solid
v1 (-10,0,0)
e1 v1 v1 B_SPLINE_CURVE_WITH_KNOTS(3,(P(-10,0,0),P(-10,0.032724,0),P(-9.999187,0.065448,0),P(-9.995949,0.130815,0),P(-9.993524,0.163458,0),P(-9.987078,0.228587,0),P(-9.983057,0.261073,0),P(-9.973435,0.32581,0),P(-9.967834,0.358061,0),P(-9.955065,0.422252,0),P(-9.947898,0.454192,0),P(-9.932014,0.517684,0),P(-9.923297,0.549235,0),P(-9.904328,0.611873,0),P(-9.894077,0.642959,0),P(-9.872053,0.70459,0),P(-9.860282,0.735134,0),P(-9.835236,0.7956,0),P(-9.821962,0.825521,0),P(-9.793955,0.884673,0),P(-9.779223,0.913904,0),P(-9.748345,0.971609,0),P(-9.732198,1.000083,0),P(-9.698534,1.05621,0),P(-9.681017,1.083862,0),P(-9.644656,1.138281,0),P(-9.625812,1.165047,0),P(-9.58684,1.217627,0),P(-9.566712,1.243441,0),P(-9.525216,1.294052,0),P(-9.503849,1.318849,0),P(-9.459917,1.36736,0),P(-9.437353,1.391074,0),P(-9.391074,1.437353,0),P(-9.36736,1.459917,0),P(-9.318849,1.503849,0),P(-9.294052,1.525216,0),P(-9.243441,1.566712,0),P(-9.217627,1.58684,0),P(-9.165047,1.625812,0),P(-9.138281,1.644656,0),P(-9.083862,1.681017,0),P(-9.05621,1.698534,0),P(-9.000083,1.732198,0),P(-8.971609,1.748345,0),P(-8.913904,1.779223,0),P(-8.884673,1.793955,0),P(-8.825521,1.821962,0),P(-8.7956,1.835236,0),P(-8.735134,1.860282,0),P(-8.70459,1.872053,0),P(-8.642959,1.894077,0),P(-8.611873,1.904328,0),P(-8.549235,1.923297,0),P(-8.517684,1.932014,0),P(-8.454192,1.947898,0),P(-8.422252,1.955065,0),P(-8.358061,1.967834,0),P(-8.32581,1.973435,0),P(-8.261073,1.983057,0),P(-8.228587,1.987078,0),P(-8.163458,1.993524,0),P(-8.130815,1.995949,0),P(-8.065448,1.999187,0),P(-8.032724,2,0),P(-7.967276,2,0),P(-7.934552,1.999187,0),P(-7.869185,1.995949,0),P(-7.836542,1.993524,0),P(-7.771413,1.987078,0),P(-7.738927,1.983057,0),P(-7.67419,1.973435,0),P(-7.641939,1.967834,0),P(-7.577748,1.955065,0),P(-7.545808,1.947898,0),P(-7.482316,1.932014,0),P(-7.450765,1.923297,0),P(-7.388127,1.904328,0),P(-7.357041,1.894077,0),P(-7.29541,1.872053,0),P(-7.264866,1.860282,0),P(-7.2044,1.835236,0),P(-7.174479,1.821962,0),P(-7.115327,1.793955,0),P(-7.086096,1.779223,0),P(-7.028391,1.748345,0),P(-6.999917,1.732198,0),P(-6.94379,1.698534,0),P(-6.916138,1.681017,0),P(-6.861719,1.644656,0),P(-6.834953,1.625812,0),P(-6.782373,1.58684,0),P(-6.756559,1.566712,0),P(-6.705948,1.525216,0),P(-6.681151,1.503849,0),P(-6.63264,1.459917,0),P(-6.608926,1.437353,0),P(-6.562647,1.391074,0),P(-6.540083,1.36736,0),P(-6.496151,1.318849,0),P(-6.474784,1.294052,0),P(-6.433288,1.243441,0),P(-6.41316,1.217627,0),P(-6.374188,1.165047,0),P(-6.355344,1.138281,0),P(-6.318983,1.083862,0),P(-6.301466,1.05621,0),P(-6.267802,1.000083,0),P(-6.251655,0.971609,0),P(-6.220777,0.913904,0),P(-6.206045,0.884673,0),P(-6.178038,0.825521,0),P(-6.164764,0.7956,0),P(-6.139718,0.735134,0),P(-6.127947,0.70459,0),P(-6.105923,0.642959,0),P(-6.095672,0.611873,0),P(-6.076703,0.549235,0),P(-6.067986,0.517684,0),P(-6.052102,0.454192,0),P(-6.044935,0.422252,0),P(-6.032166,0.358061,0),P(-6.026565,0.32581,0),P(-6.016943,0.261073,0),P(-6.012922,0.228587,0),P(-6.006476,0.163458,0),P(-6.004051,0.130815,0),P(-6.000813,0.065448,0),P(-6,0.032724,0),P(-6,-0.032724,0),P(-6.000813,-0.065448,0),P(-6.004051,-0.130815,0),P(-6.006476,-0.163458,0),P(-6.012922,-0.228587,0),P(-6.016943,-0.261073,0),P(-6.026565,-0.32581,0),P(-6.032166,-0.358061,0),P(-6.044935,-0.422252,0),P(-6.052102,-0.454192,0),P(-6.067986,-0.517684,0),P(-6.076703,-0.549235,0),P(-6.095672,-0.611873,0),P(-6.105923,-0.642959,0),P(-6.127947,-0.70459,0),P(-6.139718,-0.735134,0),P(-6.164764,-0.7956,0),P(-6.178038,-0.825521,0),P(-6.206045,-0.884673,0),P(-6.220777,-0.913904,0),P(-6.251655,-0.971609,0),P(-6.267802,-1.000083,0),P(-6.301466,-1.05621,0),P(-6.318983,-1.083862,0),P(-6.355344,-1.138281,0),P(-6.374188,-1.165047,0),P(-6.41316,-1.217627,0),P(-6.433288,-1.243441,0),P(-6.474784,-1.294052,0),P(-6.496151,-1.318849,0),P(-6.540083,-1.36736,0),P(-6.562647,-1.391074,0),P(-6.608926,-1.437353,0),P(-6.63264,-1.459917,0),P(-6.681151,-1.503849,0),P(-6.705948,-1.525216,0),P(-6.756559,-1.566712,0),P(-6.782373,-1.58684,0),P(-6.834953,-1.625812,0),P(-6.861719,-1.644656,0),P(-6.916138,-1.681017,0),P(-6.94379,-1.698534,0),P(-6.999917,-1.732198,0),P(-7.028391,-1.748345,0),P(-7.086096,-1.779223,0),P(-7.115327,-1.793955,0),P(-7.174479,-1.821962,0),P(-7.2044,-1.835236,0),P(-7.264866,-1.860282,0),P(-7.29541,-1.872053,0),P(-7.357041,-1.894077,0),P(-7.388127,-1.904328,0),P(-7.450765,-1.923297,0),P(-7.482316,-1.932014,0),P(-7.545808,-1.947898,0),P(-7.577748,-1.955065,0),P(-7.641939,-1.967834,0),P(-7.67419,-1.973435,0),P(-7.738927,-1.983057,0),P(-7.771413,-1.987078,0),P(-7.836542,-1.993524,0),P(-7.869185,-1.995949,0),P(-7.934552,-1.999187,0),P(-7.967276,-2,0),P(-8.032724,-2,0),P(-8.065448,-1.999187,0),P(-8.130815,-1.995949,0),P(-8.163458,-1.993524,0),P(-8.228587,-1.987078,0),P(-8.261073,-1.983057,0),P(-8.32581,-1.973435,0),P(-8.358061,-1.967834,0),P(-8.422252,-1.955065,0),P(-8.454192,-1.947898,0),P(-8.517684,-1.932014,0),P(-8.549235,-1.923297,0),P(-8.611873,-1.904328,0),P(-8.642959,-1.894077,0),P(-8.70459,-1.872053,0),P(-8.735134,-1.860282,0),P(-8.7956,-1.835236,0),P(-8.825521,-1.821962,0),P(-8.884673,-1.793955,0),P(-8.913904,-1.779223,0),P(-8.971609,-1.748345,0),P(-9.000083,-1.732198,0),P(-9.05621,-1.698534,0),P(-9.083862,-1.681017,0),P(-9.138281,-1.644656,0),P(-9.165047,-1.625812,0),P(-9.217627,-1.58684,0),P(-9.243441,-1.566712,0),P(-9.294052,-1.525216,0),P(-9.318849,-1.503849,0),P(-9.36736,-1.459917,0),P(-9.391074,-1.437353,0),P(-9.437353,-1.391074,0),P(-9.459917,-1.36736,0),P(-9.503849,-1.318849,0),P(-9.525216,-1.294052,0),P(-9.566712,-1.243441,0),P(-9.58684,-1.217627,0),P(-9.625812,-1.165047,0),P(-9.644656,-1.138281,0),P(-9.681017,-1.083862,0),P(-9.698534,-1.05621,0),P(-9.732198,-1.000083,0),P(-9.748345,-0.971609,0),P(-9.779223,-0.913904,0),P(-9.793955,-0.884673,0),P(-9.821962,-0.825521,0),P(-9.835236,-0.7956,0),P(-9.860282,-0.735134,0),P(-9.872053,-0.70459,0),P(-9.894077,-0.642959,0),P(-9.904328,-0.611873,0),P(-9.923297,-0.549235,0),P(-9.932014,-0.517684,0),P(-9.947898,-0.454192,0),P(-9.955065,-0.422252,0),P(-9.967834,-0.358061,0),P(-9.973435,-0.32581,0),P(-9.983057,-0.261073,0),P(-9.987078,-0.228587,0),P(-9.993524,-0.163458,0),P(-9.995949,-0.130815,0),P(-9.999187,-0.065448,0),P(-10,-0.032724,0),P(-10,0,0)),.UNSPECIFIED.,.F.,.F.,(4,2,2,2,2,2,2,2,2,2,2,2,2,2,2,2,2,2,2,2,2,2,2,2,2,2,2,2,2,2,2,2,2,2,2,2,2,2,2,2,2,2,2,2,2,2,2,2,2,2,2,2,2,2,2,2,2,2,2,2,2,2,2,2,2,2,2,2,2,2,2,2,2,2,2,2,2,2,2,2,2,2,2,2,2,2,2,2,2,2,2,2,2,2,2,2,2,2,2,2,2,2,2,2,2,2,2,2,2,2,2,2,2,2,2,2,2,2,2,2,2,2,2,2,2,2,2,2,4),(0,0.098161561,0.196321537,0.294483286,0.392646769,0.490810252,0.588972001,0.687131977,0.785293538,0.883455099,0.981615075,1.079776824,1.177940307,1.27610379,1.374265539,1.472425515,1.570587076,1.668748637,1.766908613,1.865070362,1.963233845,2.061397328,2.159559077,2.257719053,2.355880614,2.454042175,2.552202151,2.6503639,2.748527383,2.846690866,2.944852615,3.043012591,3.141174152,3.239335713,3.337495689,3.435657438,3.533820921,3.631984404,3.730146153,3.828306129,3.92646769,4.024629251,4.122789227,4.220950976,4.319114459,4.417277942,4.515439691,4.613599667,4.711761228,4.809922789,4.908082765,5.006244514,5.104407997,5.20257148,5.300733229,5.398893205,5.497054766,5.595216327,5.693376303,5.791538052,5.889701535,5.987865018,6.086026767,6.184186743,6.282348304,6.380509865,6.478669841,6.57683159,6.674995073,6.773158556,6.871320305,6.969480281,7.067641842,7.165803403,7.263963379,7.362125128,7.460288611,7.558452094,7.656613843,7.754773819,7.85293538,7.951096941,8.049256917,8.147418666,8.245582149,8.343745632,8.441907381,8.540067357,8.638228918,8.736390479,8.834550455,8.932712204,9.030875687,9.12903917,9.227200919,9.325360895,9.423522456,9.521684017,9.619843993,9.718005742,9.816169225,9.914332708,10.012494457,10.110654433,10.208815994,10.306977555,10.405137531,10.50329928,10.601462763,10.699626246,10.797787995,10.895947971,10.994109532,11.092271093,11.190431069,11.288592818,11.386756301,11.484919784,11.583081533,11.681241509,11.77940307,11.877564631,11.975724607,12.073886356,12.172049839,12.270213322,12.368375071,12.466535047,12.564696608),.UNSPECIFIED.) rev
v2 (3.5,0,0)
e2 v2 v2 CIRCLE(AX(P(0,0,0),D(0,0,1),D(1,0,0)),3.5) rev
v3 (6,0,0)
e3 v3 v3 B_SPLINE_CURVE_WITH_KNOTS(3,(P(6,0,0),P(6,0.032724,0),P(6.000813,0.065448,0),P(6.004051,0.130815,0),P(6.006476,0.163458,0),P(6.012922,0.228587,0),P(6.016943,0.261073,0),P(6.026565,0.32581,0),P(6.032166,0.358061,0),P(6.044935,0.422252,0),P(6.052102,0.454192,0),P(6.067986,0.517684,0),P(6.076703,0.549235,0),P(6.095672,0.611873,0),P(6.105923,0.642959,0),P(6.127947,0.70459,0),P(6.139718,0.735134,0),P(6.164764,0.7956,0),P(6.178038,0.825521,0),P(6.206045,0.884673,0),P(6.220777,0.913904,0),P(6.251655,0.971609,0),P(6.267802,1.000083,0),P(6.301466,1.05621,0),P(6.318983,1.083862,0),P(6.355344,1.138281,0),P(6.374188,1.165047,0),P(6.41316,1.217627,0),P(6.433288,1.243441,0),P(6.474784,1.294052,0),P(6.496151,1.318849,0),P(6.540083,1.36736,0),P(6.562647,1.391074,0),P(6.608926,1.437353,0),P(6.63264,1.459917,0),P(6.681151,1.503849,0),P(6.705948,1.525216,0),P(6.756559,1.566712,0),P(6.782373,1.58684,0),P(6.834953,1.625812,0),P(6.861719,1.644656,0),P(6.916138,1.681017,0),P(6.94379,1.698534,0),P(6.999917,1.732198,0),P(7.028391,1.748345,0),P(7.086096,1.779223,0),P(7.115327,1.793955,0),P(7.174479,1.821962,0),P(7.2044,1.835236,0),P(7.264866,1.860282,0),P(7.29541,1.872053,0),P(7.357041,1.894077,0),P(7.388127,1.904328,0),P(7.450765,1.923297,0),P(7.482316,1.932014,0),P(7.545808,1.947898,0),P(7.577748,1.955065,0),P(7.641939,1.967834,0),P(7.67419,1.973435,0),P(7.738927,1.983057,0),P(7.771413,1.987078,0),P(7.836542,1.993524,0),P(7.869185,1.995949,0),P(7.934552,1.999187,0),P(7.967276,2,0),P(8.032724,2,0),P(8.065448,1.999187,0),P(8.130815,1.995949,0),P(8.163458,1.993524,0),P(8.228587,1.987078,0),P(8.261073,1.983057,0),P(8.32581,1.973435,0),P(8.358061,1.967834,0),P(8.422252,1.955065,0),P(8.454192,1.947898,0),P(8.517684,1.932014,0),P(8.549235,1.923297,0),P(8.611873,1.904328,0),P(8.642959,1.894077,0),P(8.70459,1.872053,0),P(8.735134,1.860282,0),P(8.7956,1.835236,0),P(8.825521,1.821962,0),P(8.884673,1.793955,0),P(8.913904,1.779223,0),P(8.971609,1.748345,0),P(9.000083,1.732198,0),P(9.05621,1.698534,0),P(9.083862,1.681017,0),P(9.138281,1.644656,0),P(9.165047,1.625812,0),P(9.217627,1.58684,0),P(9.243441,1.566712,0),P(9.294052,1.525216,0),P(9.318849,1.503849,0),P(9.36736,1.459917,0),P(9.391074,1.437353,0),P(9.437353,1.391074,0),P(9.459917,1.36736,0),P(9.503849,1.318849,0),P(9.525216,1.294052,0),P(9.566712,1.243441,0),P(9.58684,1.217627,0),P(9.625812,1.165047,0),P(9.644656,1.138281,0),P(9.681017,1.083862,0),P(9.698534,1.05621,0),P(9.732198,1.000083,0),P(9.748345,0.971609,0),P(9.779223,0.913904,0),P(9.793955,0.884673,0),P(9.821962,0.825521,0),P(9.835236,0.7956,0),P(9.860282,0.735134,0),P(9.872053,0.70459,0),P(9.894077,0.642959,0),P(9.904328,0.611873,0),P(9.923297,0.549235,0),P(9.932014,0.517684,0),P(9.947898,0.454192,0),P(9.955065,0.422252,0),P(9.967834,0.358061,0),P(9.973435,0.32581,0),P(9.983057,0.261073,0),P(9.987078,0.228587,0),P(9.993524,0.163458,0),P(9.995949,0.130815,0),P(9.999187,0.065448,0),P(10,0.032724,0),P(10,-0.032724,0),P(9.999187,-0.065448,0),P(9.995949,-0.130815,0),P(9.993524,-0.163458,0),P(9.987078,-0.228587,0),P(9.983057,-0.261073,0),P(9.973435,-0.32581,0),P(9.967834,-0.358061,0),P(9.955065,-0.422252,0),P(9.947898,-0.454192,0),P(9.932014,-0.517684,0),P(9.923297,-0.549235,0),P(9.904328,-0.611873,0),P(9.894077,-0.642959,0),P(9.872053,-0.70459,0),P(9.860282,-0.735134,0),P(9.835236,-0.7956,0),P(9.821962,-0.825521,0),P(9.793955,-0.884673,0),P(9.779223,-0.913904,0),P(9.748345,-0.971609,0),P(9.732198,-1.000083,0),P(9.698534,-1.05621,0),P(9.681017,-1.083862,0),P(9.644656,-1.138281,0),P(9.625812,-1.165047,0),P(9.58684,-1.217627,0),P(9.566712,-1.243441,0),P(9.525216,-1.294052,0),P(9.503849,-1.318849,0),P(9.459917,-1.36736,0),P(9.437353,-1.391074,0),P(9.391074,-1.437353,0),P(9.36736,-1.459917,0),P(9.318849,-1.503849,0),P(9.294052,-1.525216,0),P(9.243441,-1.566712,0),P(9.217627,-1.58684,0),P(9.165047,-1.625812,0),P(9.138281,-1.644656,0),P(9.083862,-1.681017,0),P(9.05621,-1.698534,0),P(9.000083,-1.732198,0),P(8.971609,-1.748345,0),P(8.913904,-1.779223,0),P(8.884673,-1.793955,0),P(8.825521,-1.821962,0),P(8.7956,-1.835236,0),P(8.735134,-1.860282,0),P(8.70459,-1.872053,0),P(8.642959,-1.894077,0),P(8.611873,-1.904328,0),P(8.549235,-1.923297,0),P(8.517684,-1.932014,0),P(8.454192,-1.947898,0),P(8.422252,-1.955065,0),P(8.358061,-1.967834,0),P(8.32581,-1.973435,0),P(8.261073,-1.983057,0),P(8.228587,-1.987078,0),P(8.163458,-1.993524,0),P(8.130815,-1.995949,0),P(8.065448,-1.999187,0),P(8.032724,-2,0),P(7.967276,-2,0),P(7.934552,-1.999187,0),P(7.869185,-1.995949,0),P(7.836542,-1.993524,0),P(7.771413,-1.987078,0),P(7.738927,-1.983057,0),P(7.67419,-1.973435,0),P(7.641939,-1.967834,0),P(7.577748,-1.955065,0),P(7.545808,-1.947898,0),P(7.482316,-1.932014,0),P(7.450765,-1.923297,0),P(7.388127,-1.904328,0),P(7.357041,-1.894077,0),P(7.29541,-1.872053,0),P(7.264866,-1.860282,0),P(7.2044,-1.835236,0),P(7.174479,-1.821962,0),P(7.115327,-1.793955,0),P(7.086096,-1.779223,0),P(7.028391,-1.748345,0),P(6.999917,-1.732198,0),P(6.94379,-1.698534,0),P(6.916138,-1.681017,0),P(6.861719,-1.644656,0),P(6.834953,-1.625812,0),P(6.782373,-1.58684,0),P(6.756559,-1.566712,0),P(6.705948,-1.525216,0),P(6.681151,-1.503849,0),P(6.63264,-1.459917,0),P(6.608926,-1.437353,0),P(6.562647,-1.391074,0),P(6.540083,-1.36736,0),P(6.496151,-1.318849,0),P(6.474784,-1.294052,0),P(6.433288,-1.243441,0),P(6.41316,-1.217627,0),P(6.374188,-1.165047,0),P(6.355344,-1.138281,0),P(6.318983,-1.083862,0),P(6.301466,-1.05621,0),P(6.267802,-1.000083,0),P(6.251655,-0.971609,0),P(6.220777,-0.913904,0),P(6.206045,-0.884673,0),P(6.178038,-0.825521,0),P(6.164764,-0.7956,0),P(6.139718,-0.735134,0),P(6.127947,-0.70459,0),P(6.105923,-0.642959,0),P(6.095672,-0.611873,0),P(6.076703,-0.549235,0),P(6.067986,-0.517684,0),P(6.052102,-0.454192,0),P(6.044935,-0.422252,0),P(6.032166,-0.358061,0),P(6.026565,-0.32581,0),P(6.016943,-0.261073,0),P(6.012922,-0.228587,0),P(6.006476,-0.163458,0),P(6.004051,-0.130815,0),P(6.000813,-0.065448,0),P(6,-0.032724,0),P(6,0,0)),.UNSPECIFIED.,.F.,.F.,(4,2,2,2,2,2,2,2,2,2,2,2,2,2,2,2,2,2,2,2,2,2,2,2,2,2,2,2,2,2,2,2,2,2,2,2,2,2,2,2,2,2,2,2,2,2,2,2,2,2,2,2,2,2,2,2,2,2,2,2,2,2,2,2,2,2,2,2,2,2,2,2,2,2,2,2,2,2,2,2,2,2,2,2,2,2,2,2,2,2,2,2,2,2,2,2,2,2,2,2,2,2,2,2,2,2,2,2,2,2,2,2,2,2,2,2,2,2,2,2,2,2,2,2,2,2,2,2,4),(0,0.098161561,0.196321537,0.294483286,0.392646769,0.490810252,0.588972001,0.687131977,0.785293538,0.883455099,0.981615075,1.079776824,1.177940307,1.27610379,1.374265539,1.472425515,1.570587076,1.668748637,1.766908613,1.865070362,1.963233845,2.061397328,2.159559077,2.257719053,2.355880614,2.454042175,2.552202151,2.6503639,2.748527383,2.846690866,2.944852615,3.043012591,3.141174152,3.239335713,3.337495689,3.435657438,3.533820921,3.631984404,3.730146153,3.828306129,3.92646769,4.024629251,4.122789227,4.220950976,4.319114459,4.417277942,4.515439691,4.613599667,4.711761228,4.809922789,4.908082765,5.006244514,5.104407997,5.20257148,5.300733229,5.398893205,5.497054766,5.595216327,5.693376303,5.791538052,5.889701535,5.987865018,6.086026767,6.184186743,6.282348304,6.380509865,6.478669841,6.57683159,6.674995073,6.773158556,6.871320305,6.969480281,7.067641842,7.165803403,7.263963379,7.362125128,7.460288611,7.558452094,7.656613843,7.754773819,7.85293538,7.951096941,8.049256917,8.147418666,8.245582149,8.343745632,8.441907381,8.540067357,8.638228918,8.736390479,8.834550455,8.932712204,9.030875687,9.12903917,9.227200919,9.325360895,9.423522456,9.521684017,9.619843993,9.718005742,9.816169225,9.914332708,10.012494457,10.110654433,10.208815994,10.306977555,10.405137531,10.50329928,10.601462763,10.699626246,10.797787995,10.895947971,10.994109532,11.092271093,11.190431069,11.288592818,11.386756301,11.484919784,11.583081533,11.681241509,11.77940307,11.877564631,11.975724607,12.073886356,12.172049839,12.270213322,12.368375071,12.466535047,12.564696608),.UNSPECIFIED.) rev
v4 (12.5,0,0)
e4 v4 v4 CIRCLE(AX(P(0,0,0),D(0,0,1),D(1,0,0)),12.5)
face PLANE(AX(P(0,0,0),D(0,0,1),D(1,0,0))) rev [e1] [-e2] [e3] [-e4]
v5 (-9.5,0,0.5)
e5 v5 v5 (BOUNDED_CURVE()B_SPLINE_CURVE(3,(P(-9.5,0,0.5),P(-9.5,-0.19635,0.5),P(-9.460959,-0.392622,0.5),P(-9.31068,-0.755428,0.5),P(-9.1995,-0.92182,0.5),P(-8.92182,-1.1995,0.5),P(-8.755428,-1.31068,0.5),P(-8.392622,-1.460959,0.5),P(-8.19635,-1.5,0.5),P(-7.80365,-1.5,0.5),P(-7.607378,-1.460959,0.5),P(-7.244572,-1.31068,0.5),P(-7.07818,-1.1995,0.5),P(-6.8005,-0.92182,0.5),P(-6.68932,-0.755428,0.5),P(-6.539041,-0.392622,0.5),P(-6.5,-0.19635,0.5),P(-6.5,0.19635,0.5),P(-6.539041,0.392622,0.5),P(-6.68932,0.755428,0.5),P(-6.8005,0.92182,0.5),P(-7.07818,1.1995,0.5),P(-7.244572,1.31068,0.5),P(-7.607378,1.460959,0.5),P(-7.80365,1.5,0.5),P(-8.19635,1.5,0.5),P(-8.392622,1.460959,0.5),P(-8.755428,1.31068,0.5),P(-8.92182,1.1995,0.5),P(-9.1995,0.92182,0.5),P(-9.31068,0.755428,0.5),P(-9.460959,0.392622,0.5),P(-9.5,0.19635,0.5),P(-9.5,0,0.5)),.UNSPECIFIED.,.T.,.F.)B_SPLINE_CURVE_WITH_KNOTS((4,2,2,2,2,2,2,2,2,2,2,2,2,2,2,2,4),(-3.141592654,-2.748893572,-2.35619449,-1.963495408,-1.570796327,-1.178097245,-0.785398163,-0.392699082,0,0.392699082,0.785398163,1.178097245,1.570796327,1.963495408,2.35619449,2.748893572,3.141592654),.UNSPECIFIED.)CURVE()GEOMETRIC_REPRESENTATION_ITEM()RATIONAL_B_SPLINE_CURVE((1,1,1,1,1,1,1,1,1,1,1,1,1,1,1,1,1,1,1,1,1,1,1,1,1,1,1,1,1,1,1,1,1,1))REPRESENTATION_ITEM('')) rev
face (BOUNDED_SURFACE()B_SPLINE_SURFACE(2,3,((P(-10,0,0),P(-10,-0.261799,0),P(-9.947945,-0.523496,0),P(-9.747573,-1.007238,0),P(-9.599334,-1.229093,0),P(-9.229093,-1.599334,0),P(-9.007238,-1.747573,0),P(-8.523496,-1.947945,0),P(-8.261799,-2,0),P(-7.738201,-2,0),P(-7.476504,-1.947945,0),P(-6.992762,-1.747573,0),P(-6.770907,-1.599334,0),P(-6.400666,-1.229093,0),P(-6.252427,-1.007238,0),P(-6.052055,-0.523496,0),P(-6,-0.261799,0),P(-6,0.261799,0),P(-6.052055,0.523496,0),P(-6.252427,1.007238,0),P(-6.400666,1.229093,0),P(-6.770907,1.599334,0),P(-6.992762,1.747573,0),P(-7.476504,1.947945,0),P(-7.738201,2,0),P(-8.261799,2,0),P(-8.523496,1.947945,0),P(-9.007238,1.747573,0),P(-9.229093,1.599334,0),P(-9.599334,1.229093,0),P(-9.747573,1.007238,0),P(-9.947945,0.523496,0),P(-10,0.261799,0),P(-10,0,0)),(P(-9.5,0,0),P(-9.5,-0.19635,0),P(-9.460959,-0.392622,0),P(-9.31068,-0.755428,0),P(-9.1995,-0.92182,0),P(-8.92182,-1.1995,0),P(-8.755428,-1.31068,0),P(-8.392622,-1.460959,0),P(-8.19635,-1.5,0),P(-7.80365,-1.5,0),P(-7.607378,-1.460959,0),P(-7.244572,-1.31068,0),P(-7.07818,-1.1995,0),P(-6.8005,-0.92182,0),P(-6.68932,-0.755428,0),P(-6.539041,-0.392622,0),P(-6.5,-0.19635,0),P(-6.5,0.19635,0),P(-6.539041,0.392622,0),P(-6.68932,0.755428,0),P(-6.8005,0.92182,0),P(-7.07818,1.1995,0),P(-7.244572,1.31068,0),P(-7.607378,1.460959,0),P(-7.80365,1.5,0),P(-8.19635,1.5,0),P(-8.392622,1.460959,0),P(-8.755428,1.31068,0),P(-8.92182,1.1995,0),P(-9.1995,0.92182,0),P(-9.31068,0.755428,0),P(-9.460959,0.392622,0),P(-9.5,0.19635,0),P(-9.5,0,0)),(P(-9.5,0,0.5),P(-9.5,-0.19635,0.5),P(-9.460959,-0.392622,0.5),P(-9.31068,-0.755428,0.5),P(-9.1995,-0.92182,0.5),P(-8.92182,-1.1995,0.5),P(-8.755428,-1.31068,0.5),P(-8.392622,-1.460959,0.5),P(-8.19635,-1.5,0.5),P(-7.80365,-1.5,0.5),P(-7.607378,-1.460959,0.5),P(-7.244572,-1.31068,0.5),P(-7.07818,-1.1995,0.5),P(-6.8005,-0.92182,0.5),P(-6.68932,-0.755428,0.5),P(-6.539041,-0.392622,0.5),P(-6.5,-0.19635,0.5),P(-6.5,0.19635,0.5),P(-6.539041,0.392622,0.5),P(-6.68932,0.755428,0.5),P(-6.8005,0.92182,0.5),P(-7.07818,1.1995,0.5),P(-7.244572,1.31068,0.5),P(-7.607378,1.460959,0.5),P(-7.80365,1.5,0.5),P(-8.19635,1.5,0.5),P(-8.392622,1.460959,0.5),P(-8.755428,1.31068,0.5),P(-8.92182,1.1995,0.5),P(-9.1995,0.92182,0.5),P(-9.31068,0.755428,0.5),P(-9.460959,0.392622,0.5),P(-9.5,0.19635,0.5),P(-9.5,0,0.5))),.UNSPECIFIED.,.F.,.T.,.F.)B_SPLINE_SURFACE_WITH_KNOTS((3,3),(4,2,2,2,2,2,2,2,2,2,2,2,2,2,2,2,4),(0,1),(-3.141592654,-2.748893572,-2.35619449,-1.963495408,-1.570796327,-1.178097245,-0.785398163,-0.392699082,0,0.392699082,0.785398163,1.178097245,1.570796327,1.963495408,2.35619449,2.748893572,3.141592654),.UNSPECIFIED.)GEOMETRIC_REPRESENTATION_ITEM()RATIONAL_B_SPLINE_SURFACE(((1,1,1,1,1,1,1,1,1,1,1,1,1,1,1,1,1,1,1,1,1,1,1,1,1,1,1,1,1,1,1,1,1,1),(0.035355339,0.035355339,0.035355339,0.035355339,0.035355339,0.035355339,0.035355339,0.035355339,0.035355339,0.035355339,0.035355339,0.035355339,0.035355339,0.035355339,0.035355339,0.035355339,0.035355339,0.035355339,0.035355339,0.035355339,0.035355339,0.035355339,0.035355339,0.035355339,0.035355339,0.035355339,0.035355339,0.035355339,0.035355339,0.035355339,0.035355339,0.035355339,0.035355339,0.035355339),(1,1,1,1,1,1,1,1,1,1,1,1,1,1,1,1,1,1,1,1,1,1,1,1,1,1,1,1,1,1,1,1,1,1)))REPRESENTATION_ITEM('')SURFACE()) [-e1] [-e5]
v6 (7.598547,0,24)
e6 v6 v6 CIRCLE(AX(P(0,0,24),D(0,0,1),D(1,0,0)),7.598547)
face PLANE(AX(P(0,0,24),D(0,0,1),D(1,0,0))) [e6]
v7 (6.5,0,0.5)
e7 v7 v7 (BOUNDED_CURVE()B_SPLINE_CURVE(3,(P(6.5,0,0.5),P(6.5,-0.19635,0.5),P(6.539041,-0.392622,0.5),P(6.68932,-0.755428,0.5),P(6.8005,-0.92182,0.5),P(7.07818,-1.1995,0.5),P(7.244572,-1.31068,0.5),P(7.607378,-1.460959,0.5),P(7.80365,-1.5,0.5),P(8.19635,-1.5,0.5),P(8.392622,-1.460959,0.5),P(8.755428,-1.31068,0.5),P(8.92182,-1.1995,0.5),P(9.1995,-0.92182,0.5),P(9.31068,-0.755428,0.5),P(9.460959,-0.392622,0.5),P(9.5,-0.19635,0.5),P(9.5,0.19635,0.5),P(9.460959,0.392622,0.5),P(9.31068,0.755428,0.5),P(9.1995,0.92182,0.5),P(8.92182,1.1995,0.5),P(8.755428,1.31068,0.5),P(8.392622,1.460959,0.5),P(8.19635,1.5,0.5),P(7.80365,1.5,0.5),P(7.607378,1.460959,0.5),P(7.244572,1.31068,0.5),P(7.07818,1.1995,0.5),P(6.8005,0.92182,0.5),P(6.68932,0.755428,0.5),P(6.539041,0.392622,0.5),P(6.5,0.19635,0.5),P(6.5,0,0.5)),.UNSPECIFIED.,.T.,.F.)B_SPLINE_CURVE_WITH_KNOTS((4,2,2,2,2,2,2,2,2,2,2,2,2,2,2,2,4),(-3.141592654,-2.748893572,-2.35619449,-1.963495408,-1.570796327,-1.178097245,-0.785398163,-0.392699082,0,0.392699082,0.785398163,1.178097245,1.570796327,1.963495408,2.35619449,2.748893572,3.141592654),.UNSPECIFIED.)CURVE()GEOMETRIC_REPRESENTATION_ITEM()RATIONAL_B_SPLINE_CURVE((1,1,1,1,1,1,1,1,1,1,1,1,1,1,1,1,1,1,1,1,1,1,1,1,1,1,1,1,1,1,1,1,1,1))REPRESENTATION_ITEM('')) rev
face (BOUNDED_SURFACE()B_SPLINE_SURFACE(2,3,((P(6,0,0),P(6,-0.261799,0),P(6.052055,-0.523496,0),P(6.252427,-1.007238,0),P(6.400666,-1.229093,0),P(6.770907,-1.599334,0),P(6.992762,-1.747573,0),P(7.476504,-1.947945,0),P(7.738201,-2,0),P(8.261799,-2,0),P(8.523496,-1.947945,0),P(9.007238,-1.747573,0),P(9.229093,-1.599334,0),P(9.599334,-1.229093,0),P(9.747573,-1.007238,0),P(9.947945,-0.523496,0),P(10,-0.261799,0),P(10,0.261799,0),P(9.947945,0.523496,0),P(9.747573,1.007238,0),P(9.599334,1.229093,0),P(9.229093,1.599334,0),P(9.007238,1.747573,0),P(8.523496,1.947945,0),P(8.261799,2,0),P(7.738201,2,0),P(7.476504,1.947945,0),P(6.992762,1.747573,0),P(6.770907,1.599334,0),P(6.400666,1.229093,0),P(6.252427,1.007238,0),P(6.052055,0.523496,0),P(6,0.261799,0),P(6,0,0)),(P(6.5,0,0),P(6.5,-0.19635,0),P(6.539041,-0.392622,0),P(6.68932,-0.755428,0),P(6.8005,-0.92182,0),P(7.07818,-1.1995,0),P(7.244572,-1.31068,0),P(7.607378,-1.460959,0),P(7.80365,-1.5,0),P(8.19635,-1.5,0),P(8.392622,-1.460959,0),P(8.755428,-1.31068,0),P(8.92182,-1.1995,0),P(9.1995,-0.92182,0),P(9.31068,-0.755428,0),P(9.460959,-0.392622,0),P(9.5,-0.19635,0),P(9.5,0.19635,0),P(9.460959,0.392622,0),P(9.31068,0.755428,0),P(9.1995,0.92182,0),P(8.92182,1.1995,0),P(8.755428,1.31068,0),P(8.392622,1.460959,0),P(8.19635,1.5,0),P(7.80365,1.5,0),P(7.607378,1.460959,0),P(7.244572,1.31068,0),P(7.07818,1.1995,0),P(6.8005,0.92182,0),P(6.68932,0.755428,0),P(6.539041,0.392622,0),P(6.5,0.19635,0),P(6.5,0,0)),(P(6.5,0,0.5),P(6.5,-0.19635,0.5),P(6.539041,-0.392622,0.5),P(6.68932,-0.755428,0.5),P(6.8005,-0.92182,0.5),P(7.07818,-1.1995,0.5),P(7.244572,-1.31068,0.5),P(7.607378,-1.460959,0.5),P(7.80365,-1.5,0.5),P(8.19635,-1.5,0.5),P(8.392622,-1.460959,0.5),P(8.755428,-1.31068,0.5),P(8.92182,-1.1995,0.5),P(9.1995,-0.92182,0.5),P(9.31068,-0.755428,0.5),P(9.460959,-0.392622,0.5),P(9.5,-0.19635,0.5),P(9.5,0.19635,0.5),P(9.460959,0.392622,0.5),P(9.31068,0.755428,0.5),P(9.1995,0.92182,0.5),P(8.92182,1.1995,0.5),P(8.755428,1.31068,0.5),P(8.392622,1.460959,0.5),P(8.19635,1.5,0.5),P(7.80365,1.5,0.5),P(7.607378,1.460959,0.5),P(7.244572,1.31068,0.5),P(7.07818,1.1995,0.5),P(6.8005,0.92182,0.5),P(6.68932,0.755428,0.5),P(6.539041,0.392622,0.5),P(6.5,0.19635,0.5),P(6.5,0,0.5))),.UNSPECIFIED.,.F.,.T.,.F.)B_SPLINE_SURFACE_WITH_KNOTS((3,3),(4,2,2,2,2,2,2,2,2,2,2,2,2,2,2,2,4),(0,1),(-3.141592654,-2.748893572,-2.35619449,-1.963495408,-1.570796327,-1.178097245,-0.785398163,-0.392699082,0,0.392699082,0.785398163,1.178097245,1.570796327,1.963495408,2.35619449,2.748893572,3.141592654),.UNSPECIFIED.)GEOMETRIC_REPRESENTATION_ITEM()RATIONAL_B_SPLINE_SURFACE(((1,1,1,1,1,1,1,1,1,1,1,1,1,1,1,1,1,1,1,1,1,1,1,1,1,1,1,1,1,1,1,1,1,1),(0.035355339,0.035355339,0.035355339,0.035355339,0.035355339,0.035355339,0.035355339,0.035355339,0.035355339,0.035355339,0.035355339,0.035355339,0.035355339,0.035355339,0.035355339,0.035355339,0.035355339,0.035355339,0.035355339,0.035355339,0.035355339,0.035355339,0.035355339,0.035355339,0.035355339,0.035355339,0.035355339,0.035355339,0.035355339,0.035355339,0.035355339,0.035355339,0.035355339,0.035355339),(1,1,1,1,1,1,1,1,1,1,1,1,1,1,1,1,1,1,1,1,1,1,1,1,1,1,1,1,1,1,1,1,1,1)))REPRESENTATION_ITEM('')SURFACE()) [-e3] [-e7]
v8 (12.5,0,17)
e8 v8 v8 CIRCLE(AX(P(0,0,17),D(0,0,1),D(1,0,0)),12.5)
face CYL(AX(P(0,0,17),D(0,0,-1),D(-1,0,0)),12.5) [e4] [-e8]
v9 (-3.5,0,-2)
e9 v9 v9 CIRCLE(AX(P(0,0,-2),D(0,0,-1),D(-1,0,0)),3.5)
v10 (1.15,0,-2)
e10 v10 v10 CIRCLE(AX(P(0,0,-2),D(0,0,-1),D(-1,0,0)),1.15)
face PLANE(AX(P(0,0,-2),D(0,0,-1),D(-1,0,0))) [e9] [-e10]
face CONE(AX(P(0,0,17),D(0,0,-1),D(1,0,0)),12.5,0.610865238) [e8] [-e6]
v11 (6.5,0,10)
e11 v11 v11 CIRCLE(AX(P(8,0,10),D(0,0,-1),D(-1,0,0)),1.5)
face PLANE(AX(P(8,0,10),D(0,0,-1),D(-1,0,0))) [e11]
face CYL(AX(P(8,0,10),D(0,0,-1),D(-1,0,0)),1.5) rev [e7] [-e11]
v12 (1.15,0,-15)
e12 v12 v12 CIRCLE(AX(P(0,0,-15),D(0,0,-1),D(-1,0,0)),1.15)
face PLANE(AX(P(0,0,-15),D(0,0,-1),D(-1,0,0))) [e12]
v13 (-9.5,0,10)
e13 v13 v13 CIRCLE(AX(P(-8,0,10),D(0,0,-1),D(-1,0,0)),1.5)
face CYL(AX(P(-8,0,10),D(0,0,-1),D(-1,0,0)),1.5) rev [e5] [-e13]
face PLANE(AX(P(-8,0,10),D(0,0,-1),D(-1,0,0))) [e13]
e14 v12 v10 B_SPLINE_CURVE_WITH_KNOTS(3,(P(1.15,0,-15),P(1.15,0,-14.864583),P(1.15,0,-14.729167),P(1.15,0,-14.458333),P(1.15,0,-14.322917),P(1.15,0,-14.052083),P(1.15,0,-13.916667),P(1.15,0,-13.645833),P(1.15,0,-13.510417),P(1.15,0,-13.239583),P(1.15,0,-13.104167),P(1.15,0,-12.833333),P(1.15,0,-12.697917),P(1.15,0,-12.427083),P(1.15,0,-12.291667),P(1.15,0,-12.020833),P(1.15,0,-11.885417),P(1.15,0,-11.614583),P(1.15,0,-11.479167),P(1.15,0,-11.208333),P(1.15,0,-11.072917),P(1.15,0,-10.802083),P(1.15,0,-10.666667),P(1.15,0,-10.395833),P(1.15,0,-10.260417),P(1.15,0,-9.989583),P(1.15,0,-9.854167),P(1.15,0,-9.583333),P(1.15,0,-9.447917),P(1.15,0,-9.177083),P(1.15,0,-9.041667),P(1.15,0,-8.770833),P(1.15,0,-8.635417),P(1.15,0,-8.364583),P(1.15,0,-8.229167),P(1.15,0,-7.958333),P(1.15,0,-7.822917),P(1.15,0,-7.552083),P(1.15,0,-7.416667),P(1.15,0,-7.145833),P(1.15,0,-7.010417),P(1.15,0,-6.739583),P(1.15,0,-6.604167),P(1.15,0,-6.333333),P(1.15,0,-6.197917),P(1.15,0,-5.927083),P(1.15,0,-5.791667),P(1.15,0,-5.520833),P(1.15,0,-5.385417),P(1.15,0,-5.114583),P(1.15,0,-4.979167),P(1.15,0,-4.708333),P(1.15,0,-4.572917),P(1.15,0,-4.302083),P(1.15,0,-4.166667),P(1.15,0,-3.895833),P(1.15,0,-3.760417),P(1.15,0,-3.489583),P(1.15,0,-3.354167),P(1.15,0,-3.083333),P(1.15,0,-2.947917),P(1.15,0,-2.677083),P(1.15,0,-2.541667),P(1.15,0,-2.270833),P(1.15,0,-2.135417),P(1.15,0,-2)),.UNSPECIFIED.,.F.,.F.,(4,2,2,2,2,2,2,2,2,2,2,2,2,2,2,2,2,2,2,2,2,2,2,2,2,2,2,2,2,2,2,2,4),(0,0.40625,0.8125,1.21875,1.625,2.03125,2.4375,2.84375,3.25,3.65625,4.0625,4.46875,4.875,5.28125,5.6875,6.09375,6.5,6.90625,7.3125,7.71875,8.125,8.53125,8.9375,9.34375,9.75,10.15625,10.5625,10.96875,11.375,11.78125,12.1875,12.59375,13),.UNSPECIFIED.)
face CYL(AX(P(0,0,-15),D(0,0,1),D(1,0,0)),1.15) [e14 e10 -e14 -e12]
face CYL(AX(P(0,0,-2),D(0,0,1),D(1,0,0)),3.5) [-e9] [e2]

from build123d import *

# Parameters (mm, degrees)
ESQUISSE1_R             = 12.5
BOSS_EXTRU_1_DEPTH      = 17
ESQUISSE2_R             = 12.5
BOSS_EXTRU_2_DEPTH      = 7
BOSS_EXTRU_2_TAPER      = 35
ESQUISSE3_R             = 1.5
ENL_V_MAT_EXTRU_1_DEPTH = 10
CONG_1_SIZE             = 0.5
ESQUISSE4_R             = 3.5
BOSS_EXTRU_3_DEPTH      = 2
ESQUISSE5_R             = 1.15
BOSS_EXTRU_4_DEPTH      = 13


with BuildPart() as part:
    # Esquisse1 → Boss.-Extru.1 (new body)
    with BuildSketch(Plane.XY):
        Circle(ESQUISSE1_R)
    extrude(amount=BOSS_EXTRU_1_DEPTH)

    # Esquisse2 → Boss.-Extru.2 (add)
    with BuildSketch(Plane.XY.offset(17)):
        Circle(ESQUISSE2_R)
    extrude(amount=BOSS_EXTRU_2_DEPTH, taper=BOSS_EXTRU_2_TAPER)

    # Esquisse3 → Enlèv. mat.-Extru.1 (cut)
    with BuildSketch(Plane(origin=(0, 0, 0), x_dir=(-1, 0, 0), z_dir=(0, 0, -1))):
        with Locations((-8, 0)):
            Circle(ESQUISSE3_R)
        with Locations((8, 0)):
            Circle(ESQUISSE3_R)
    extrude(amount=-ENL_V_MAT_EXTRU_1_DEPTH, mode=Mode.SUBTRACT)

    # Congé1
    # a fillet whose section is not a circle: 0.5 mm, written as the material it takes off along each edge
    with BuildSketch(Plane(origin=(-8, 0, 0), x_dir=(-1, 0, 0), z_dir=(0, -1, 0))) as cong_1_piece_1:
        with BuildLine():
            Bezier((1.5 + CONG_1_SIZE, 0), (1.5, 0), (1.5, -CONG_1_SIZE), weights=[1, 0.035355339, 1])
            Line((1.5, -CONG_1_SIZE), (1.5, 0))
            Line((1.5, 0), (1.5 + CONG_1_SIZE, 0))
        make_face()
    revolve(axis=Axis((-8, 0, 0), (0, 0, -1)), mode=Mode.SUBTRACT)
    with BuildSketch(Plane(origin=(8, 0, 0), x_dir=(-1, 0, 0), z_dir=(0, -1, 0))) as cong_1_piece_2:
        with BuildLine():
            Bezier((1.5 + CONG_1_SIZE, 0), (1.5, 0), (1.5, -CONG_1_SIZE), weights=[1, 0.035355339, 1])
            Line((1.5, -CONG_1_SIZE), (1.5, 0))
            Line((1.5, 0), (1.5 + CONG_1_SIZE, 0))
        make_face()
    revolve(axis=Axis((8, 0, 0), (0, 0, -1)), mode=Mode.SUBTRACT)

    # Esquisse4 → Boss.-Extru.3 (add)
    with BuildSketch(Plane(origin=(0, 0, 0), x_dir=(-1, 0, 0), z_dir=(0, 0, -1))):
        with Locations(Location((0, 0, 0), (0, 0, 180))):
            Circle(ESQUISSE4_R)
    extrude(amount=BOSS_EXTRU_3_DEPTH)

    # Esquisse5 → Boss.-Extru.4 (add)
    with BuildSketch(Plane(origin=(0, 0, -2), x_dir=(-1, 0, 0), z_dir=(0, 0, -1))):
        with Locations(Location((0, 0, 0), (0, 0, 180))):
            Circle(ESQUISSE5_R)
    extrude(amount=BOSS_EXTRU_4_DEPTH)


solid = part.part
